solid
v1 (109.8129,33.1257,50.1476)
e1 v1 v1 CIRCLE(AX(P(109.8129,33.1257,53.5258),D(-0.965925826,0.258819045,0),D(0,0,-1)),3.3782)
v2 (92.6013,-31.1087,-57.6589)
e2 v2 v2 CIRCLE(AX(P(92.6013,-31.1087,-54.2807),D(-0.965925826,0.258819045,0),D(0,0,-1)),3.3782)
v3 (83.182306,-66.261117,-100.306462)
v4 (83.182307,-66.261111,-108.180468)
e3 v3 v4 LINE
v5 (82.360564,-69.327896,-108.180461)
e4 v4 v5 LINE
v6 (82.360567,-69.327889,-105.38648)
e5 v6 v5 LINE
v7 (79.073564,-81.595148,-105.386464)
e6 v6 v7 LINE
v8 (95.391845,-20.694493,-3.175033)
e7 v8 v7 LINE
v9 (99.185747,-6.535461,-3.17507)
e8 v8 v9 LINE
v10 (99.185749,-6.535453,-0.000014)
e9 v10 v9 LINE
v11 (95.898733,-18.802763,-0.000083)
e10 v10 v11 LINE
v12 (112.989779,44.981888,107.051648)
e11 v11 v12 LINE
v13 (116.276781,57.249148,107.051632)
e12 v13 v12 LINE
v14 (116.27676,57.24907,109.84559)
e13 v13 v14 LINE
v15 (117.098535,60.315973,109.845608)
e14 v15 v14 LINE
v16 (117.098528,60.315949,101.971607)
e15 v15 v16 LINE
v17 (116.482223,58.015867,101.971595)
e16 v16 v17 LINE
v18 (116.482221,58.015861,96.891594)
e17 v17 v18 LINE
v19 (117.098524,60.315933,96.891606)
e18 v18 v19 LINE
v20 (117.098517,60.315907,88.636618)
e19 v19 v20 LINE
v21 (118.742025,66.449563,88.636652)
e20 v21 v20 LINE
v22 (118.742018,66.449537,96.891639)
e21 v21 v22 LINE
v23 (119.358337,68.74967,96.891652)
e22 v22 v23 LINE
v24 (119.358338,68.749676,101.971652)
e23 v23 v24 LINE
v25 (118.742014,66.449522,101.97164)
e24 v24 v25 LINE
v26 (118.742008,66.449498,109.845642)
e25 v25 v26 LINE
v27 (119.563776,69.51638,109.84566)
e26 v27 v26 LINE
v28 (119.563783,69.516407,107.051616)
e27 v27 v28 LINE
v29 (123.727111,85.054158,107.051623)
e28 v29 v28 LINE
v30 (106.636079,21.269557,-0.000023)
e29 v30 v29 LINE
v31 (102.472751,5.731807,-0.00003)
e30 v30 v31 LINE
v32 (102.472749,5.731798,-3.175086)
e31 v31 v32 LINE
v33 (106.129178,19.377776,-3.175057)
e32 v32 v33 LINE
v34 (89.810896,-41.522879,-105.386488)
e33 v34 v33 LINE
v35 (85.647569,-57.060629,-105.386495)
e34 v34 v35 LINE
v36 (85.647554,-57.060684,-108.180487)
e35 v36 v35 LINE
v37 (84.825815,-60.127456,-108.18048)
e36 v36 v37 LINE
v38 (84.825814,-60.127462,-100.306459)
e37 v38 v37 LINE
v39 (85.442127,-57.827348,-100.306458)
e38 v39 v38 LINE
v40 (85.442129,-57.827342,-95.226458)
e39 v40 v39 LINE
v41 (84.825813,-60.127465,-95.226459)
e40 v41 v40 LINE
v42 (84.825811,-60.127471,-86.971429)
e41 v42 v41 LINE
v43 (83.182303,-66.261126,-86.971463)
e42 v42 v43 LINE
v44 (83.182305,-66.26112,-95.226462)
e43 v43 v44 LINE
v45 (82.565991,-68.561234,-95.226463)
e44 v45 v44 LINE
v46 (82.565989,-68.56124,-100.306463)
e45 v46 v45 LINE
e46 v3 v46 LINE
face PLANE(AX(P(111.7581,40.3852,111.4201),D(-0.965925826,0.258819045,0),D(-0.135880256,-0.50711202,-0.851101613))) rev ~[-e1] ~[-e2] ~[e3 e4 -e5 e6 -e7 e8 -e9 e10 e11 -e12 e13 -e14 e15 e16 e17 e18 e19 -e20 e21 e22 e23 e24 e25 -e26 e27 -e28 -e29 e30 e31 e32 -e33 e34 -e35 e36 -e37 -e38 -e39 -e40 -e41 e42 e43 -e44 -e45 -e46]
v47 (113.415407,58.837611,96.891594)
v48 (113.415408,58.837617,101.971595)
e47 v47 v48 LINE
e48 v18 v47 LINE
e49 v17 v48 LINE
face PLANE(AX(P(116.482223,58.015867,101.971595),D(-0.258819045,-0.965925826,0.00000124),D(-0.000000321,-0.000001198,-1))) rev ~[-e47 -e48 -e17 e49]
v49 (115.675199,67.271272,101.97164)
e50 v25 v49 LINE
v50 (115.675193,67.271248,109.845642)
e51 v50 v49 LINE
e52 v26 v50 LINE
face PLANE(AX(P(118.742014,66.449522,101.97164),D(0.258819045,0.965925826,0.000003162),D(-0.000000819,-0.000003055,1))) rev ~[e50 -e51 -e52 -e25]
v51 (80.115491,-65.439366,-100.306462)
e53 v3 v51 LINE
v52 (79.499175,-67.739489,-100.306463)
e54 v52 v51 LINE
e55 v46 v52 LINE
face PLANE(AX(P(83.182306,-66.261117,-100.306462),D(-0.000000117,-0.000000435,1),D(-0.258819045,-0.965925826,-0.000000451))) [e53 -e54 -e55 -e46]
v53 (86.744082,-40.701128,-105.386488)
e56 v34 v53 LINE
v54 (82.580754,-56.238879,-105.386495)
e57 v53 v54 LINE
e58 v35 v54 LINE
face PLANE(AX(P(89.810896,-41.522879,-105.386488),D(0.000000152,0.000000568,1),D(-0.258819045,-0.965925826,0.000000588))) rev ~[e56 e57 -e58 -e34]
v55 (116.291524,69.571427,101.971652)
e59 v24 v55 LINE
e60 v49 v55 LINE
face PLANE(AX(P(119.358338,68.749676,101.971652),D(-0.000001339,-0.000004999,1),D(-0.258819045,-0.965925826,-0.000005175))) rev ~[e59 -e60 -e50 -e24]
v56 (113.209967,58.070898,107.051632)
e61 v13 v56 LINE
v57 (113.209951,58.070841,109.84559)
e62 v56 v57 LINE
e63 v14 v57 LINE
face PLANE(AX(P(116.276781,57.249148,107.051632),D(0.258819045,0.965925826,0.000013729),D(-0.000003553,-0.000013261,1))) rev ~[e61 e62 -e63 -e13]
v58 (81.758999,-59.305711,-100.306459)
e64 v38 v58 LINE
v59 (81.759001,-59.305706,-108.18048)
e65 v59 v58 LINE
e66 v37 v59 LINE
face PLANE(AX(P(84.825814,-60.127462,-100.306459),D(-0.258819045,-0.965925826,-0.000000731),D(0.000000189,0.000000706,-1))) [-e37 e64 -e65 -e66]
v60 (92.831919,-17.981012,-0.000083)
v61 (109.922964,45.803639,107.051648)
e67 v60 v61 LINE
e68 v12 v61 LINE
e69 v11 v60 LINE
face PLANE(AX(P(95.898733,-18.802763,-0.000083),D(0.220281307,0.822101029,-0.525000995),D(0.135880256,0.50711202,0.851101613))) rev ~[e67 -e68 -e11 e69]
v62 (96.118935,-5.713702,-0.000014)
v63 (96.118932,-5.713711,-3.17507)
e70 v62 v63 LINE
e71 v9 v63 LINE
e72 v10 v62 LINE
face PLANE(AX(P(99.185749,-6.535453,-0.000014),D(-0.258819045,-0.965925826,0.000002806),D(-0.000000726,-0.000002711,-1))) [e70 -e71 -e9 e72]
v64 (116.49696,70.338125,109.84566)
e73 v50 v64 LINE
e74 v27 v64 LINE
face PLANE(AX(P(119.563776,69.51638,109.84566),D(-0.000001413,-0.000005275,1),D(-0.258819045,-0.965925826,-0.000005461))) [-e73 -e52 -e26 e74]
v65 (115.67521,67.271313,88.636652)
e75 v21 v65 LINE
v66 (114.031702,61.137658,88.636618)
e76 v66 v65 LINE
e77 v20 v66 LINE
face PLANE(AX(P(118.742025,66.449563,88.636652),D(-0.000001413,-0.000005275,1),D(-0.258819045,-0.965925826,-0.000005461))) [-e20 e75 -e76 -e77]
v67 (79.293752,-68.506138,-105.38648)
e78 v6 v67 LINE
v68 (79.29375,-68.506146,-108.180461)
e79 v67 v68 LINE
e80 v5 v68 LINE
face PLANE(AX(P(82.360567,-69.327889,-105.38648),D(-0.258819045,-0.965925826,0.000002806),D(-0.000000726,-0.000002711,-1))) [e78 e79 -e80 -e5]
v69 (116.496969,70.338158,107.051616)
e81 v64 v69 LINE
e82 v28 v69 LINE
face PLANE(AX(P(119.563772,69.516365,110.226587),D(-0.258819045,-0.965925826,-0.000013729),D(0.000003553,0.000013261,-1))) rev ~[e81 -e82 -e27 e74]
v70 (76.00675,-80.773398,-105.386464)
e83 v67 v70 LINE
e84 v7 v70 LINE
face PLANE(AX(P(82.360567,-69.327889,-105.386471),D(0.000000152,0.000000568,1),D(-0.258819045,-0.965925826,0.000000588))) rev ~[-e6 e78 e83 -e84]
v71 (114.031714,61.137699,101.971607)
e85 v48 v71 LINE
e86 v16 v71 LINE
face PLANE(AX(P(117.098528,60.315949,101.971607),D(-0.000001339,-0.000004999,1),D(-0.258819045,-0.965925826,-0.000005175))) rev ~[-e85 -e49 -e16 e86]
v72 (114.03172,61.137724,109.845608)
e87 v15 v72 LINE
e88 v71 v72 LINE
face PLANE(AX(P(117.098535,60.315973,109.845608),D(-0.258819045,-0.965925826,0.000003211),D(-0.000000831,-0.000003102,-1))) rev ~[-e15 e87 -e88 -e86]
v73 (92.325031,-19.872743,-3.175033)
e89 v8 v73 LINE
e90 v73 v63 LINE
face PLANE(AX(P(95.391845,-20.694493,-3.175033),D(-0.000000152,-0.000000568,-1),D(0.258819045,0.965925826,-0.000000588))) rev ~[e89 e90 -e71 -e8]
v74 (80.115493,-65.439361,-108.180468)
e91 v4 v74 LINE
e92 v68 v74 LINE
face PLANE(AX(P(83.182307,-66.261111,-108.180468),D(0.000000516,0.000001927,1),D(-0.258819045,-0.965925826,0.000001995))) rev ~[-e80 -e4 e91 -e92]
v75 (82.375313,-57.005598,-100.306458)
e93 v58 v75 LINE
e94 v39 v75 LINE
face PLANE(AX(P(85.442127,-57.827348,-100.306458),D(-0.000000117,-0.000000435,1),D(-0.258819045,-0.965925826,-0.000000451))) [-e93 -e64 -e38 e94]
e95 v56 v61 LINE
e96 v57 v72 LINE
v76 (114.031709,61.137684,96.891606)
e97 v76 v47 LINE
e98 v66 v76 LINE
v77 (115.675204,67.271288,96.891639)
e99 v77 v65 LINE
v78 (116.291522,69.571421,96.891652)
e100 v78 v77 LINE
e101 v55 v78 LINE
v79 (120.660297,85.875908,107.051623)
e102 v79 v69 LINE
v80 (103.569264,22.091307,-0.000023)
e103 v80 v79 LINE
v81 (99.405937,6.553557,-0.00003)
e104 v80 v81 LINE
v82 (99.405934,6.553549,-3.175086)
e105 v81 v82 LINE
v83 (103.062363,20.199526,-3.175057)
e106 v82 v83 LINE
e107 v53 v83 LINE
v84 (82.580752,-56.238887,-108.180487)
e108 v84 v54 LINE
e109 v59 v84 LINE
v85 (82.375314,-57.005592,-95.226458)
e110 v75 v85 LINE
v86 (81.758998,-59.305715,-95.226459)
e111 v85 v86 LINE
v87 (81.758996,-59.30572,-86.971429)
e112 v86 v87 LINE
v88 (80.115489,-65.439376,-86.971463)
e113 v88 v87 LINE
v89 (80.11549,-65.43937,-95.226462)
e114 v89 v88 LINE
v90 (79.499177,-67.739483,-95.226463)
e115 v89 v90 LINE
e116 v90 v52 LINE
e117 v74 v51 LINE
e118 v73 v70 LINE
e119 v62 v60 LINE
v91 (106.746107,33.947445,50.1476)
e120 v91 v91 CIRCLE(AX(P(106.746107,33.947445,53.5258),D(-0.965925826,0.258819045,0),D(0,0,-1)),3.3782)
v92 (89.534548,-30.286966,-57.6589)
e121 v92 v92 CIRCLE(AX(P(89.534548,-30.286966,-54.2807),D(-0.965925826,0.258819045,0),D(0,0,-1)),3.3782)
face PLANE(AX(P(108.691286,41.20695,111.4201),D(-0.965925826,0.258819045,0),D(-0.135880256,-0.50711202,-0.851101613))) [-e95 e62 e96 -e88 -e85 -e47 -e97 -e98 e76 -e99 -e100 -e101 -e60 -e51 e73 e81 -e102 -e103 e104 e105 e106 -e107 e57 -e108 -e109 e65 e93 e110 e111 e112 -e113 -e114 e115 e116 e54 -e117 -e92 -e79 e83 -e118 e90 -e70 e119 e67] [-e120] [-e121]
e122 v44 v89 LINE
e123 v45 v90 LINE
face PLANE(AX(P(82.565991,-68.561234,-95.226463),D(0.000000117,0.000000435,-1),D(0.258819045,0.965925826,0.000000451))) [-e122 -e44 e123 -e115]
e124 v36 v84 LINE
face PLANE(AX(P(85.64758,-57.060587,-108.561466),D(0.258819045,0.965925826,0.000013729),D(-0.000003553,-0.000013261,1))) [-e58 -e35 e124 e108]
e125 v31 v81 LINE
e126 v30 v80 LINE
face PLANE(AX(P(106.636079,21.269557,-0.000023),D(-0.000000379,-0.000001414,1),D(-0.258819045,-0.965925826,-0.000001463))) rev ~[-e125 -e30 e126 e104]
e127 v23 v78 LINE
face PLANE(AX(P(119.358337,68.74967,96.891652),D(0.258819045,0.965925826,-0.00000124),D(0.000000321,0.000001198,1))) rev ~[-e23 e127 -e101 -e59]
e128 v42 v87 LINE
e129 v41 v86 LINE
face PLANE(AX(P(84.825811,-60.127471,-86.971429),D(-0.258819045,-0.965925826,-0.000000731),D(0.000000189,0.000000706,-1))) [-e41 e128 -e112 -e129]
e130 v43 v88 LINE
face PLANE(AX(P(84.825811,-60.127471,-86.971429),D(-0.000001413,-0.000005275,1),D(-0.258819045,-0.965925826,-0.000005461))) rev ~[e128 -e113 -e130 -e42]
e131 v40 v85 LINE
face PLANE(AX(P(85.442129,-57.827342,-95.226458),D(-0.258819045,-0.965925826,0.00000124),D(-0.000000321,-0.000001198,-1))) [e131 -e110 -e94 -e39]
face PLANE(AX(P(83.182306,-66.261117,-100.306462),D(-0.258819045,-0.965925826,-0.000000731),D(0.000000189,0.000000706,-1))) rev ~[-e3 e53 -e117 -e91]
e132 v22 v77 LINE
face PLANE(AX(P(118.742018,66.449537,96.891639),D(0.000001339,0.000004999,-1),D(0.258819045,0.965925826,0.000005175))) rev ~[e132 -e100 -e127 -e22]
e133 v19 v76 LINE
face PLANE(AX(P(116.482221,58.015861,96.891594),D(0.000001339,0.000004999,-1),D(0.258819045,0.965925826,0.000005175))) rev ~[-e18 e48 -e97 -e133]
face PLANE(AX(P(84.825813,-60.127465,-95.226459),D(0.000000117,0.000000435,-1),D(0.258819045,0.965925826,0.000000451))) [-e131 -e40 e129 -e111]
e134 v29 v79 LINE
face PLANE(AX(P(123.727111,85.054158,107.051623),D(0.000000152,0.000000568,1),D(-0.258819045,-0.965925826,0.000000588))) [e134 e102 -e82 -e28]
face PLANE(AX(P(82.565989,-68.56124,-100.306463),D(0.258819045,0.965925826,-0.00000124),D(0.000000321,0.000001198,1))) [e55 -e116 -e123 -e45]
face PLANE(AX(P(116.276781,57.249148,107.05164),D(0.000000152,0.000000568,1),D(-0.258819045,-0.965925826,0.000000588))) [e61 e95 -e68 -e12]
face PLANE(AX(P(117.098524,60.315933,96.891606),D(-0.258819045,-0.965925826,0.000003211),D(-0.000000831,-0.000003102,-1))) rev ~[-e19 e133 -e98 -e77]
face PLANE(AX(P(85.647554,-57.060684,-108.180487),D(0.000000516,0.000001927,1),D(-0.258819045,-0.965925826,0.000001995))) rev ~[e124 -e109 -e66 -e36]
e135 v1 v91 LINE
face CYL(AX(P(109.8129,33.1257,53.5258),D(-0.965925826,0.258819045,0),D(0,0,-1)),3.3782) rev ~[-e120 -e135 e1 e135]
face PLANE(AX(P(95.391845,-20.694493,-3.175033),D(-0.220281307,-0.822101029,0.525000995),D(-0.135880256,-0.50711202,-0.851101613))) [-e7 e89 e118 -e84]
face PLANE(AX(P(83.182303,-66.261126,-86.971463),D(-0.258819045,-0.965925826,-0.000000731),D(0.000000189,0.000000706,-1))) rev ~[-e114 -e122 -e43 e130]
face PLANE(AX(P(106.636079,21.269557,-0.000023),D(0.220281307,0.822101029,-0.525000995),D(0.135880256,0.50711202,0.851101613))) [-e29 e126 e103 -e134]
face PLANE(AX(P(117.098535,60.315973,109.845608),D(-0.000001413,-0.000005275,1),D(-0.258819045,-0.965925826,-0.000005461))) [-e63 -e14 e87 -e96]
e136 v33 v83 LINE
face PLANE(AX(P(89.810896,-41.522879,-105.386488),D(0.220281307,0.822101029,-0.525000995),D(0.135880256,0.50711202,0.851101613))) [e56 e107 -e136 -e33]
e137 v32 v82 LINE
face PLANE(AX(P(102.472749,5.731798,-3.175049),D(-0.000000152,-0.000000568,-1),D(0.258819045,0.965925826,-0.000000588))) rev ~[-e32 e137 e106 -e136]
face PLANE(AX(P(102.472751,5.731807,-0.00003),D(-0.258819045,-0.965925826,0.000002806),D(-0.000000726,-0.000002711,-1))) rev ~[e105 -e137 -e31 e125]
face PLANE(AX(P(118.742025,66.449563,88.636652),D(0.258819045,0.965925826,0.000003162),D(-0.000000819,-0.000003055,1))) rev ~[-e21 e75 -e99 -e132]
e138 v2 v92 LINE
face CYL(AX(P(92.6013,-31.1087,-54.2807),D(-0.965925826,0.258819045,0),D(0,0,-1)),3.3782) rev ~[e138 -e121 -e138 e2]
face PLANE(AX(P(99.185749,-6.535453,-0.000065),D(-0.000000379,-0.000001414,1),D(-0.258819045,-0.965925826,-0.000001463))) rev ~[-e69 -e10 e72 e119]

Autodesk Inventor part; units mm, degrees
ref_plane "YZ Plane" through (0, 0, 0) normal (1, 0, 0) x (0, 1, 0)
ref_plane "XZ Plane" through (0, 0, 0) normal (0, 1, 0) x (-1, 0, 0)
ref_plane "Work Plane1" through (111.7581, 40.3852, 111.4201) normal (-0.9659258, 0.258819, 0) x (-0.1358803, -0.507112, -0.8511016)
sketch "Sketch1" plane through (111.7581, 40.3852, 111.4201) normal (-0.9659258, 0.258819, 0) x (-0.1358803, -0.507112, -0.8511016)
  line L0 (0, -6.3437) -> (253.9995, -6.3437) construction
  line L1 (228.4809, -42.564) -> (250.8233, -6.3437) construction
  line L2 (108.9501, -41.6524) -> (130.3466, -6.9656) construction
  line L3 (107.0353, -38.7089) -> (126.9998, -6.3437) construction
  line L4 (-20.5605, -41.6524) -> (-3.3186, -13.7009) construction
  line L5 (-4.9348, -10.2733) -> (-23.2434, -39.9543) construction
  line L6 (-3.3186, -13.7009) -> (1.2196, -6.3437) construction
  line L7 (130.3466, -6.9656) -> (130.7302, -6.3437) construction
  line L8 (130.7302, -6.3437) -> (250.8233, -6.3437)
  line L9 (126.9998, -6.3437) -> (1.2196, -6.3437)
  line L10 (-20.5605, -41.6524) -> (108.9501, -41.6524) construction
  line L11 (108.9501, -41.6524) -> (232.7736, -41.6524) construction
  line L12 (107.0353, -38.7089) -> (105.2196, -41.6524) construction
  line L13 (229.0432, -41.6524) -> (250.8233, -6.3437)
  line L14 (229.0432, -41.6524) -> (108.9501, -41.6524)
  line L15 (130.7302, -6.3437) -> (108.9501, -41.6524)
  line L16 (105.2196, -41.6524) -> (126.9998, -6.3437)
  line L17 (105.2196, -41.6524) -> (-20.5605, -41.6524)
  line L18 (-20.5605, -41.6524) -> (1.2196, -6.3437)
  line L19 (120.3322, -17.1527) -> (123.0345, -18.8196)
  line L20 (113.6647, -27.9617) -> (116.367, -29.6286)
  line L21 (244.1558, -17.1527) -> (246.8581, -18.8196)
  line L22 (246.8581, -18.8196) -> (240.1905, -29.6286)
  line L23 (240.1905, -29.6286) -> (237.4883, -27.9617)
  line L24 (-5.4479, -17.1527) -> (-8.1501, -15.4858)
  line L25 (-8.1501, -15.4858) -> (-14.8176, -26.2948)
  line L26 (-14.8176, -26.2948) -> (-12.1154, -27.9617)
  line L27 (256.5554, -3.0988) -> (232.2107, -42.5651) construction
  line L28 (105.2196, -41.6524) -> (134.1991, 5.3274) construction
  line L29 (136.9013, 3.6606) -> (107.9219, -43.3193) construction
  line L30 (12.8127, 12.4503) -> (-20.8503, -42.1222) construction
  line L31 (-23.5525, -40.4553) -> (10.1104, 14.1172) construction
  line L32 (256.5554, -3.0988) -> (232.2107, -42.5651) construction
  line L33 (237.4883, -27.9617) -> (229.5084, -40.8982) construction
  line L34 (250.8233, -6.3437) -> (244.1558, -17.1527) construction
  point P0 (126.9998, -6.3437)
  dimension "d0" = 12.7
  dimension "d1" = 12.7
  dimension "d2" = 12.7
  dimension "d3" = 12.7
  dimension "d4" = 12.7
  dimension "d5" = 12.7
extrude "Extrusion1" add sketch "Sketch1" along normal blind 3.175
sketch "Sketch2" plane through (111.7581, 40.3852, 111.4201) normal (0.9659258, -0.258819, 0) x (-0.1358803, -0.507112, -0.8511016)
  line L0 (-20.5605, 41.6524) -> (105.2196, 41.6524) construction
  line L1 (42.3296, 41.6524) -> (64.1097, 6.3437) construction
  line L2 (126.9998, 6.3437) -> (1.2196, 6.3437) construction
  line L3 (108.9501, 41.6524) -> (229.0432, 41.6524) construction
  line L4 (168.9966, 41.6524) -> (190.7768, 6.3437) construction
  line L5 (250.8233, 6.3437) -> (130.7302, 6.3437) construction
  point P0 (130.4954, 0.6768)
  point P1 (53.2196, 23.9981)
  point P2 (179.8867, 23.9981)
hole "Hole1" at (109.8129, 33.1257, 53.5258) at (92.6013, -31.1087, -54.2807) direction (-0.9659258, 0.258819, 0) diameter 6.7564 depth 13.6144 clearance for "Flat Head Machine Screw (82)" size "1/4" standard "Ansi Unified Screw Threads"
sketch "Sketch3" plane through (111.7581, 40.3852, 111.4201) normal (0.9659258, -0.258819, 0) x (-0.1358803, -0.507112, -0.8511016)
  line L0 (-8.1501, 15.4858) -> (-14.8176, 26.2948) projected
  line L1 (-11.4839, 20.8903) -> (6.8914, 32.2251) construction
  line L2 (5.2245, 34.9273) -> (-13.1507, 23.5925)
  line L3 (-8.1501, 15.4858) -> (-14.8176, 26.2948) projected
  line L4 (-9.817, 18.1881) -> (8.5583, 29.5228)
  line L5 (2.7826, 23.1623) -> (-3.0515, 32.6201)
  line L6 (-3.0515, 32.6201) -> (-7.3751, 29.9531)
  line L7 (-7.3751, 29.9531) -> (-1.541, 20.4953)
  line L8 (-1.541, 20.4953) -> (2.7826, 23.1623)
  line L9 (-7.3751, 29.9531) -> (2.7826, 23.1623) construction
  line L10 (240.1905, 29.6286) -> (246.8581, 18.8196) projected
  line L11 (243.5243, 24.2241) -> (225.149, 12.8893) construction
  line L12 (5.2245, 34.9273) -> (8.5583, 29.5228)
  line L13 (223.4821, 15.5915) -> (226.8159, 10.187)
  line L14 (226.8159, 10.187) -> (245.1912, 21.5218)
  line L15 (223.4821, 15.5915) -> (241.8574, 26.9263)
  line L16 (239.4155, 15.1612) -> (235.0919, 12.4942)
  line L17 (235.0919, 12.4942) -> (229.2578, 21.9521)
  line L18 (229.2578, 21.9521) -> (233.5814, 24.6191)
  line L19 (233.5814, 24.6191) -> (239.4155, 15.1612)
  line L20 (239.4155, 15.1612) -> (229.2578, 21.9521) construction
  line L21 (-14.4934, 26.4948) -> (-7.8258, 15.6858)
  line L22 (-14.8176, 26.2948) -> (-12.1154, 27.9617) projected
  line L23 (-5.4479, 17.1527) -> (-8.1501, 15.4858) projected
  line L24 (239.8663, 29.4285) -> (246.584, 18.5381)
  line L25 (246.8581, 18.8196) -> (244.1558, 17.1527) projected
  line L26 (237.4883, 27.9617) -> (240.1905, 29.6286) projected
  point P0 (130.4954, 0.6768)
  point P1 (-2.2962, 26.5577)
  point P2 (234.3367, 18.5567)
  point P3 (1.5325, 25.1889)
  point P4 (-1.8013, 30.5934)
  point P5 (-6.1249, 27.9264)
  point P6 (-9.817, 18.1881)
  point P7 (-2.7911, 22.5219)
  point P8 (238.1653, 17.1879)
  point P9 (234.8316, 22.5924)
  point P10 (230.508, 19.9254)
  point P11 (233.8417, 14.5209)
  point P12 (241.5332, 26.7263)
  point P13 (246.5338, 18.6195)
  point P14 (244.8669, 21.3218)
  point P15 (-12.8265, 23.7926)
  point P16 (-9.4927, 18.3881)
  dimension "d16" = 21.59
  dimension "d19" = 11.1125
  dimension "d20" = 5.08
  dimension "d21" = 21.59
  dimension "d22" = 6.35
  dimension "d23" = 6.35
  dimension "d24" = 5.08
  dimension "d25" = 11.1125
  dimension "d28" = 0.381
  dimension "d29" = 0.381
extrude "Extrusion2" cut sketch "Sketch3" against normal through all
properties part number "SidePlate" material "Aluminum 6061"
